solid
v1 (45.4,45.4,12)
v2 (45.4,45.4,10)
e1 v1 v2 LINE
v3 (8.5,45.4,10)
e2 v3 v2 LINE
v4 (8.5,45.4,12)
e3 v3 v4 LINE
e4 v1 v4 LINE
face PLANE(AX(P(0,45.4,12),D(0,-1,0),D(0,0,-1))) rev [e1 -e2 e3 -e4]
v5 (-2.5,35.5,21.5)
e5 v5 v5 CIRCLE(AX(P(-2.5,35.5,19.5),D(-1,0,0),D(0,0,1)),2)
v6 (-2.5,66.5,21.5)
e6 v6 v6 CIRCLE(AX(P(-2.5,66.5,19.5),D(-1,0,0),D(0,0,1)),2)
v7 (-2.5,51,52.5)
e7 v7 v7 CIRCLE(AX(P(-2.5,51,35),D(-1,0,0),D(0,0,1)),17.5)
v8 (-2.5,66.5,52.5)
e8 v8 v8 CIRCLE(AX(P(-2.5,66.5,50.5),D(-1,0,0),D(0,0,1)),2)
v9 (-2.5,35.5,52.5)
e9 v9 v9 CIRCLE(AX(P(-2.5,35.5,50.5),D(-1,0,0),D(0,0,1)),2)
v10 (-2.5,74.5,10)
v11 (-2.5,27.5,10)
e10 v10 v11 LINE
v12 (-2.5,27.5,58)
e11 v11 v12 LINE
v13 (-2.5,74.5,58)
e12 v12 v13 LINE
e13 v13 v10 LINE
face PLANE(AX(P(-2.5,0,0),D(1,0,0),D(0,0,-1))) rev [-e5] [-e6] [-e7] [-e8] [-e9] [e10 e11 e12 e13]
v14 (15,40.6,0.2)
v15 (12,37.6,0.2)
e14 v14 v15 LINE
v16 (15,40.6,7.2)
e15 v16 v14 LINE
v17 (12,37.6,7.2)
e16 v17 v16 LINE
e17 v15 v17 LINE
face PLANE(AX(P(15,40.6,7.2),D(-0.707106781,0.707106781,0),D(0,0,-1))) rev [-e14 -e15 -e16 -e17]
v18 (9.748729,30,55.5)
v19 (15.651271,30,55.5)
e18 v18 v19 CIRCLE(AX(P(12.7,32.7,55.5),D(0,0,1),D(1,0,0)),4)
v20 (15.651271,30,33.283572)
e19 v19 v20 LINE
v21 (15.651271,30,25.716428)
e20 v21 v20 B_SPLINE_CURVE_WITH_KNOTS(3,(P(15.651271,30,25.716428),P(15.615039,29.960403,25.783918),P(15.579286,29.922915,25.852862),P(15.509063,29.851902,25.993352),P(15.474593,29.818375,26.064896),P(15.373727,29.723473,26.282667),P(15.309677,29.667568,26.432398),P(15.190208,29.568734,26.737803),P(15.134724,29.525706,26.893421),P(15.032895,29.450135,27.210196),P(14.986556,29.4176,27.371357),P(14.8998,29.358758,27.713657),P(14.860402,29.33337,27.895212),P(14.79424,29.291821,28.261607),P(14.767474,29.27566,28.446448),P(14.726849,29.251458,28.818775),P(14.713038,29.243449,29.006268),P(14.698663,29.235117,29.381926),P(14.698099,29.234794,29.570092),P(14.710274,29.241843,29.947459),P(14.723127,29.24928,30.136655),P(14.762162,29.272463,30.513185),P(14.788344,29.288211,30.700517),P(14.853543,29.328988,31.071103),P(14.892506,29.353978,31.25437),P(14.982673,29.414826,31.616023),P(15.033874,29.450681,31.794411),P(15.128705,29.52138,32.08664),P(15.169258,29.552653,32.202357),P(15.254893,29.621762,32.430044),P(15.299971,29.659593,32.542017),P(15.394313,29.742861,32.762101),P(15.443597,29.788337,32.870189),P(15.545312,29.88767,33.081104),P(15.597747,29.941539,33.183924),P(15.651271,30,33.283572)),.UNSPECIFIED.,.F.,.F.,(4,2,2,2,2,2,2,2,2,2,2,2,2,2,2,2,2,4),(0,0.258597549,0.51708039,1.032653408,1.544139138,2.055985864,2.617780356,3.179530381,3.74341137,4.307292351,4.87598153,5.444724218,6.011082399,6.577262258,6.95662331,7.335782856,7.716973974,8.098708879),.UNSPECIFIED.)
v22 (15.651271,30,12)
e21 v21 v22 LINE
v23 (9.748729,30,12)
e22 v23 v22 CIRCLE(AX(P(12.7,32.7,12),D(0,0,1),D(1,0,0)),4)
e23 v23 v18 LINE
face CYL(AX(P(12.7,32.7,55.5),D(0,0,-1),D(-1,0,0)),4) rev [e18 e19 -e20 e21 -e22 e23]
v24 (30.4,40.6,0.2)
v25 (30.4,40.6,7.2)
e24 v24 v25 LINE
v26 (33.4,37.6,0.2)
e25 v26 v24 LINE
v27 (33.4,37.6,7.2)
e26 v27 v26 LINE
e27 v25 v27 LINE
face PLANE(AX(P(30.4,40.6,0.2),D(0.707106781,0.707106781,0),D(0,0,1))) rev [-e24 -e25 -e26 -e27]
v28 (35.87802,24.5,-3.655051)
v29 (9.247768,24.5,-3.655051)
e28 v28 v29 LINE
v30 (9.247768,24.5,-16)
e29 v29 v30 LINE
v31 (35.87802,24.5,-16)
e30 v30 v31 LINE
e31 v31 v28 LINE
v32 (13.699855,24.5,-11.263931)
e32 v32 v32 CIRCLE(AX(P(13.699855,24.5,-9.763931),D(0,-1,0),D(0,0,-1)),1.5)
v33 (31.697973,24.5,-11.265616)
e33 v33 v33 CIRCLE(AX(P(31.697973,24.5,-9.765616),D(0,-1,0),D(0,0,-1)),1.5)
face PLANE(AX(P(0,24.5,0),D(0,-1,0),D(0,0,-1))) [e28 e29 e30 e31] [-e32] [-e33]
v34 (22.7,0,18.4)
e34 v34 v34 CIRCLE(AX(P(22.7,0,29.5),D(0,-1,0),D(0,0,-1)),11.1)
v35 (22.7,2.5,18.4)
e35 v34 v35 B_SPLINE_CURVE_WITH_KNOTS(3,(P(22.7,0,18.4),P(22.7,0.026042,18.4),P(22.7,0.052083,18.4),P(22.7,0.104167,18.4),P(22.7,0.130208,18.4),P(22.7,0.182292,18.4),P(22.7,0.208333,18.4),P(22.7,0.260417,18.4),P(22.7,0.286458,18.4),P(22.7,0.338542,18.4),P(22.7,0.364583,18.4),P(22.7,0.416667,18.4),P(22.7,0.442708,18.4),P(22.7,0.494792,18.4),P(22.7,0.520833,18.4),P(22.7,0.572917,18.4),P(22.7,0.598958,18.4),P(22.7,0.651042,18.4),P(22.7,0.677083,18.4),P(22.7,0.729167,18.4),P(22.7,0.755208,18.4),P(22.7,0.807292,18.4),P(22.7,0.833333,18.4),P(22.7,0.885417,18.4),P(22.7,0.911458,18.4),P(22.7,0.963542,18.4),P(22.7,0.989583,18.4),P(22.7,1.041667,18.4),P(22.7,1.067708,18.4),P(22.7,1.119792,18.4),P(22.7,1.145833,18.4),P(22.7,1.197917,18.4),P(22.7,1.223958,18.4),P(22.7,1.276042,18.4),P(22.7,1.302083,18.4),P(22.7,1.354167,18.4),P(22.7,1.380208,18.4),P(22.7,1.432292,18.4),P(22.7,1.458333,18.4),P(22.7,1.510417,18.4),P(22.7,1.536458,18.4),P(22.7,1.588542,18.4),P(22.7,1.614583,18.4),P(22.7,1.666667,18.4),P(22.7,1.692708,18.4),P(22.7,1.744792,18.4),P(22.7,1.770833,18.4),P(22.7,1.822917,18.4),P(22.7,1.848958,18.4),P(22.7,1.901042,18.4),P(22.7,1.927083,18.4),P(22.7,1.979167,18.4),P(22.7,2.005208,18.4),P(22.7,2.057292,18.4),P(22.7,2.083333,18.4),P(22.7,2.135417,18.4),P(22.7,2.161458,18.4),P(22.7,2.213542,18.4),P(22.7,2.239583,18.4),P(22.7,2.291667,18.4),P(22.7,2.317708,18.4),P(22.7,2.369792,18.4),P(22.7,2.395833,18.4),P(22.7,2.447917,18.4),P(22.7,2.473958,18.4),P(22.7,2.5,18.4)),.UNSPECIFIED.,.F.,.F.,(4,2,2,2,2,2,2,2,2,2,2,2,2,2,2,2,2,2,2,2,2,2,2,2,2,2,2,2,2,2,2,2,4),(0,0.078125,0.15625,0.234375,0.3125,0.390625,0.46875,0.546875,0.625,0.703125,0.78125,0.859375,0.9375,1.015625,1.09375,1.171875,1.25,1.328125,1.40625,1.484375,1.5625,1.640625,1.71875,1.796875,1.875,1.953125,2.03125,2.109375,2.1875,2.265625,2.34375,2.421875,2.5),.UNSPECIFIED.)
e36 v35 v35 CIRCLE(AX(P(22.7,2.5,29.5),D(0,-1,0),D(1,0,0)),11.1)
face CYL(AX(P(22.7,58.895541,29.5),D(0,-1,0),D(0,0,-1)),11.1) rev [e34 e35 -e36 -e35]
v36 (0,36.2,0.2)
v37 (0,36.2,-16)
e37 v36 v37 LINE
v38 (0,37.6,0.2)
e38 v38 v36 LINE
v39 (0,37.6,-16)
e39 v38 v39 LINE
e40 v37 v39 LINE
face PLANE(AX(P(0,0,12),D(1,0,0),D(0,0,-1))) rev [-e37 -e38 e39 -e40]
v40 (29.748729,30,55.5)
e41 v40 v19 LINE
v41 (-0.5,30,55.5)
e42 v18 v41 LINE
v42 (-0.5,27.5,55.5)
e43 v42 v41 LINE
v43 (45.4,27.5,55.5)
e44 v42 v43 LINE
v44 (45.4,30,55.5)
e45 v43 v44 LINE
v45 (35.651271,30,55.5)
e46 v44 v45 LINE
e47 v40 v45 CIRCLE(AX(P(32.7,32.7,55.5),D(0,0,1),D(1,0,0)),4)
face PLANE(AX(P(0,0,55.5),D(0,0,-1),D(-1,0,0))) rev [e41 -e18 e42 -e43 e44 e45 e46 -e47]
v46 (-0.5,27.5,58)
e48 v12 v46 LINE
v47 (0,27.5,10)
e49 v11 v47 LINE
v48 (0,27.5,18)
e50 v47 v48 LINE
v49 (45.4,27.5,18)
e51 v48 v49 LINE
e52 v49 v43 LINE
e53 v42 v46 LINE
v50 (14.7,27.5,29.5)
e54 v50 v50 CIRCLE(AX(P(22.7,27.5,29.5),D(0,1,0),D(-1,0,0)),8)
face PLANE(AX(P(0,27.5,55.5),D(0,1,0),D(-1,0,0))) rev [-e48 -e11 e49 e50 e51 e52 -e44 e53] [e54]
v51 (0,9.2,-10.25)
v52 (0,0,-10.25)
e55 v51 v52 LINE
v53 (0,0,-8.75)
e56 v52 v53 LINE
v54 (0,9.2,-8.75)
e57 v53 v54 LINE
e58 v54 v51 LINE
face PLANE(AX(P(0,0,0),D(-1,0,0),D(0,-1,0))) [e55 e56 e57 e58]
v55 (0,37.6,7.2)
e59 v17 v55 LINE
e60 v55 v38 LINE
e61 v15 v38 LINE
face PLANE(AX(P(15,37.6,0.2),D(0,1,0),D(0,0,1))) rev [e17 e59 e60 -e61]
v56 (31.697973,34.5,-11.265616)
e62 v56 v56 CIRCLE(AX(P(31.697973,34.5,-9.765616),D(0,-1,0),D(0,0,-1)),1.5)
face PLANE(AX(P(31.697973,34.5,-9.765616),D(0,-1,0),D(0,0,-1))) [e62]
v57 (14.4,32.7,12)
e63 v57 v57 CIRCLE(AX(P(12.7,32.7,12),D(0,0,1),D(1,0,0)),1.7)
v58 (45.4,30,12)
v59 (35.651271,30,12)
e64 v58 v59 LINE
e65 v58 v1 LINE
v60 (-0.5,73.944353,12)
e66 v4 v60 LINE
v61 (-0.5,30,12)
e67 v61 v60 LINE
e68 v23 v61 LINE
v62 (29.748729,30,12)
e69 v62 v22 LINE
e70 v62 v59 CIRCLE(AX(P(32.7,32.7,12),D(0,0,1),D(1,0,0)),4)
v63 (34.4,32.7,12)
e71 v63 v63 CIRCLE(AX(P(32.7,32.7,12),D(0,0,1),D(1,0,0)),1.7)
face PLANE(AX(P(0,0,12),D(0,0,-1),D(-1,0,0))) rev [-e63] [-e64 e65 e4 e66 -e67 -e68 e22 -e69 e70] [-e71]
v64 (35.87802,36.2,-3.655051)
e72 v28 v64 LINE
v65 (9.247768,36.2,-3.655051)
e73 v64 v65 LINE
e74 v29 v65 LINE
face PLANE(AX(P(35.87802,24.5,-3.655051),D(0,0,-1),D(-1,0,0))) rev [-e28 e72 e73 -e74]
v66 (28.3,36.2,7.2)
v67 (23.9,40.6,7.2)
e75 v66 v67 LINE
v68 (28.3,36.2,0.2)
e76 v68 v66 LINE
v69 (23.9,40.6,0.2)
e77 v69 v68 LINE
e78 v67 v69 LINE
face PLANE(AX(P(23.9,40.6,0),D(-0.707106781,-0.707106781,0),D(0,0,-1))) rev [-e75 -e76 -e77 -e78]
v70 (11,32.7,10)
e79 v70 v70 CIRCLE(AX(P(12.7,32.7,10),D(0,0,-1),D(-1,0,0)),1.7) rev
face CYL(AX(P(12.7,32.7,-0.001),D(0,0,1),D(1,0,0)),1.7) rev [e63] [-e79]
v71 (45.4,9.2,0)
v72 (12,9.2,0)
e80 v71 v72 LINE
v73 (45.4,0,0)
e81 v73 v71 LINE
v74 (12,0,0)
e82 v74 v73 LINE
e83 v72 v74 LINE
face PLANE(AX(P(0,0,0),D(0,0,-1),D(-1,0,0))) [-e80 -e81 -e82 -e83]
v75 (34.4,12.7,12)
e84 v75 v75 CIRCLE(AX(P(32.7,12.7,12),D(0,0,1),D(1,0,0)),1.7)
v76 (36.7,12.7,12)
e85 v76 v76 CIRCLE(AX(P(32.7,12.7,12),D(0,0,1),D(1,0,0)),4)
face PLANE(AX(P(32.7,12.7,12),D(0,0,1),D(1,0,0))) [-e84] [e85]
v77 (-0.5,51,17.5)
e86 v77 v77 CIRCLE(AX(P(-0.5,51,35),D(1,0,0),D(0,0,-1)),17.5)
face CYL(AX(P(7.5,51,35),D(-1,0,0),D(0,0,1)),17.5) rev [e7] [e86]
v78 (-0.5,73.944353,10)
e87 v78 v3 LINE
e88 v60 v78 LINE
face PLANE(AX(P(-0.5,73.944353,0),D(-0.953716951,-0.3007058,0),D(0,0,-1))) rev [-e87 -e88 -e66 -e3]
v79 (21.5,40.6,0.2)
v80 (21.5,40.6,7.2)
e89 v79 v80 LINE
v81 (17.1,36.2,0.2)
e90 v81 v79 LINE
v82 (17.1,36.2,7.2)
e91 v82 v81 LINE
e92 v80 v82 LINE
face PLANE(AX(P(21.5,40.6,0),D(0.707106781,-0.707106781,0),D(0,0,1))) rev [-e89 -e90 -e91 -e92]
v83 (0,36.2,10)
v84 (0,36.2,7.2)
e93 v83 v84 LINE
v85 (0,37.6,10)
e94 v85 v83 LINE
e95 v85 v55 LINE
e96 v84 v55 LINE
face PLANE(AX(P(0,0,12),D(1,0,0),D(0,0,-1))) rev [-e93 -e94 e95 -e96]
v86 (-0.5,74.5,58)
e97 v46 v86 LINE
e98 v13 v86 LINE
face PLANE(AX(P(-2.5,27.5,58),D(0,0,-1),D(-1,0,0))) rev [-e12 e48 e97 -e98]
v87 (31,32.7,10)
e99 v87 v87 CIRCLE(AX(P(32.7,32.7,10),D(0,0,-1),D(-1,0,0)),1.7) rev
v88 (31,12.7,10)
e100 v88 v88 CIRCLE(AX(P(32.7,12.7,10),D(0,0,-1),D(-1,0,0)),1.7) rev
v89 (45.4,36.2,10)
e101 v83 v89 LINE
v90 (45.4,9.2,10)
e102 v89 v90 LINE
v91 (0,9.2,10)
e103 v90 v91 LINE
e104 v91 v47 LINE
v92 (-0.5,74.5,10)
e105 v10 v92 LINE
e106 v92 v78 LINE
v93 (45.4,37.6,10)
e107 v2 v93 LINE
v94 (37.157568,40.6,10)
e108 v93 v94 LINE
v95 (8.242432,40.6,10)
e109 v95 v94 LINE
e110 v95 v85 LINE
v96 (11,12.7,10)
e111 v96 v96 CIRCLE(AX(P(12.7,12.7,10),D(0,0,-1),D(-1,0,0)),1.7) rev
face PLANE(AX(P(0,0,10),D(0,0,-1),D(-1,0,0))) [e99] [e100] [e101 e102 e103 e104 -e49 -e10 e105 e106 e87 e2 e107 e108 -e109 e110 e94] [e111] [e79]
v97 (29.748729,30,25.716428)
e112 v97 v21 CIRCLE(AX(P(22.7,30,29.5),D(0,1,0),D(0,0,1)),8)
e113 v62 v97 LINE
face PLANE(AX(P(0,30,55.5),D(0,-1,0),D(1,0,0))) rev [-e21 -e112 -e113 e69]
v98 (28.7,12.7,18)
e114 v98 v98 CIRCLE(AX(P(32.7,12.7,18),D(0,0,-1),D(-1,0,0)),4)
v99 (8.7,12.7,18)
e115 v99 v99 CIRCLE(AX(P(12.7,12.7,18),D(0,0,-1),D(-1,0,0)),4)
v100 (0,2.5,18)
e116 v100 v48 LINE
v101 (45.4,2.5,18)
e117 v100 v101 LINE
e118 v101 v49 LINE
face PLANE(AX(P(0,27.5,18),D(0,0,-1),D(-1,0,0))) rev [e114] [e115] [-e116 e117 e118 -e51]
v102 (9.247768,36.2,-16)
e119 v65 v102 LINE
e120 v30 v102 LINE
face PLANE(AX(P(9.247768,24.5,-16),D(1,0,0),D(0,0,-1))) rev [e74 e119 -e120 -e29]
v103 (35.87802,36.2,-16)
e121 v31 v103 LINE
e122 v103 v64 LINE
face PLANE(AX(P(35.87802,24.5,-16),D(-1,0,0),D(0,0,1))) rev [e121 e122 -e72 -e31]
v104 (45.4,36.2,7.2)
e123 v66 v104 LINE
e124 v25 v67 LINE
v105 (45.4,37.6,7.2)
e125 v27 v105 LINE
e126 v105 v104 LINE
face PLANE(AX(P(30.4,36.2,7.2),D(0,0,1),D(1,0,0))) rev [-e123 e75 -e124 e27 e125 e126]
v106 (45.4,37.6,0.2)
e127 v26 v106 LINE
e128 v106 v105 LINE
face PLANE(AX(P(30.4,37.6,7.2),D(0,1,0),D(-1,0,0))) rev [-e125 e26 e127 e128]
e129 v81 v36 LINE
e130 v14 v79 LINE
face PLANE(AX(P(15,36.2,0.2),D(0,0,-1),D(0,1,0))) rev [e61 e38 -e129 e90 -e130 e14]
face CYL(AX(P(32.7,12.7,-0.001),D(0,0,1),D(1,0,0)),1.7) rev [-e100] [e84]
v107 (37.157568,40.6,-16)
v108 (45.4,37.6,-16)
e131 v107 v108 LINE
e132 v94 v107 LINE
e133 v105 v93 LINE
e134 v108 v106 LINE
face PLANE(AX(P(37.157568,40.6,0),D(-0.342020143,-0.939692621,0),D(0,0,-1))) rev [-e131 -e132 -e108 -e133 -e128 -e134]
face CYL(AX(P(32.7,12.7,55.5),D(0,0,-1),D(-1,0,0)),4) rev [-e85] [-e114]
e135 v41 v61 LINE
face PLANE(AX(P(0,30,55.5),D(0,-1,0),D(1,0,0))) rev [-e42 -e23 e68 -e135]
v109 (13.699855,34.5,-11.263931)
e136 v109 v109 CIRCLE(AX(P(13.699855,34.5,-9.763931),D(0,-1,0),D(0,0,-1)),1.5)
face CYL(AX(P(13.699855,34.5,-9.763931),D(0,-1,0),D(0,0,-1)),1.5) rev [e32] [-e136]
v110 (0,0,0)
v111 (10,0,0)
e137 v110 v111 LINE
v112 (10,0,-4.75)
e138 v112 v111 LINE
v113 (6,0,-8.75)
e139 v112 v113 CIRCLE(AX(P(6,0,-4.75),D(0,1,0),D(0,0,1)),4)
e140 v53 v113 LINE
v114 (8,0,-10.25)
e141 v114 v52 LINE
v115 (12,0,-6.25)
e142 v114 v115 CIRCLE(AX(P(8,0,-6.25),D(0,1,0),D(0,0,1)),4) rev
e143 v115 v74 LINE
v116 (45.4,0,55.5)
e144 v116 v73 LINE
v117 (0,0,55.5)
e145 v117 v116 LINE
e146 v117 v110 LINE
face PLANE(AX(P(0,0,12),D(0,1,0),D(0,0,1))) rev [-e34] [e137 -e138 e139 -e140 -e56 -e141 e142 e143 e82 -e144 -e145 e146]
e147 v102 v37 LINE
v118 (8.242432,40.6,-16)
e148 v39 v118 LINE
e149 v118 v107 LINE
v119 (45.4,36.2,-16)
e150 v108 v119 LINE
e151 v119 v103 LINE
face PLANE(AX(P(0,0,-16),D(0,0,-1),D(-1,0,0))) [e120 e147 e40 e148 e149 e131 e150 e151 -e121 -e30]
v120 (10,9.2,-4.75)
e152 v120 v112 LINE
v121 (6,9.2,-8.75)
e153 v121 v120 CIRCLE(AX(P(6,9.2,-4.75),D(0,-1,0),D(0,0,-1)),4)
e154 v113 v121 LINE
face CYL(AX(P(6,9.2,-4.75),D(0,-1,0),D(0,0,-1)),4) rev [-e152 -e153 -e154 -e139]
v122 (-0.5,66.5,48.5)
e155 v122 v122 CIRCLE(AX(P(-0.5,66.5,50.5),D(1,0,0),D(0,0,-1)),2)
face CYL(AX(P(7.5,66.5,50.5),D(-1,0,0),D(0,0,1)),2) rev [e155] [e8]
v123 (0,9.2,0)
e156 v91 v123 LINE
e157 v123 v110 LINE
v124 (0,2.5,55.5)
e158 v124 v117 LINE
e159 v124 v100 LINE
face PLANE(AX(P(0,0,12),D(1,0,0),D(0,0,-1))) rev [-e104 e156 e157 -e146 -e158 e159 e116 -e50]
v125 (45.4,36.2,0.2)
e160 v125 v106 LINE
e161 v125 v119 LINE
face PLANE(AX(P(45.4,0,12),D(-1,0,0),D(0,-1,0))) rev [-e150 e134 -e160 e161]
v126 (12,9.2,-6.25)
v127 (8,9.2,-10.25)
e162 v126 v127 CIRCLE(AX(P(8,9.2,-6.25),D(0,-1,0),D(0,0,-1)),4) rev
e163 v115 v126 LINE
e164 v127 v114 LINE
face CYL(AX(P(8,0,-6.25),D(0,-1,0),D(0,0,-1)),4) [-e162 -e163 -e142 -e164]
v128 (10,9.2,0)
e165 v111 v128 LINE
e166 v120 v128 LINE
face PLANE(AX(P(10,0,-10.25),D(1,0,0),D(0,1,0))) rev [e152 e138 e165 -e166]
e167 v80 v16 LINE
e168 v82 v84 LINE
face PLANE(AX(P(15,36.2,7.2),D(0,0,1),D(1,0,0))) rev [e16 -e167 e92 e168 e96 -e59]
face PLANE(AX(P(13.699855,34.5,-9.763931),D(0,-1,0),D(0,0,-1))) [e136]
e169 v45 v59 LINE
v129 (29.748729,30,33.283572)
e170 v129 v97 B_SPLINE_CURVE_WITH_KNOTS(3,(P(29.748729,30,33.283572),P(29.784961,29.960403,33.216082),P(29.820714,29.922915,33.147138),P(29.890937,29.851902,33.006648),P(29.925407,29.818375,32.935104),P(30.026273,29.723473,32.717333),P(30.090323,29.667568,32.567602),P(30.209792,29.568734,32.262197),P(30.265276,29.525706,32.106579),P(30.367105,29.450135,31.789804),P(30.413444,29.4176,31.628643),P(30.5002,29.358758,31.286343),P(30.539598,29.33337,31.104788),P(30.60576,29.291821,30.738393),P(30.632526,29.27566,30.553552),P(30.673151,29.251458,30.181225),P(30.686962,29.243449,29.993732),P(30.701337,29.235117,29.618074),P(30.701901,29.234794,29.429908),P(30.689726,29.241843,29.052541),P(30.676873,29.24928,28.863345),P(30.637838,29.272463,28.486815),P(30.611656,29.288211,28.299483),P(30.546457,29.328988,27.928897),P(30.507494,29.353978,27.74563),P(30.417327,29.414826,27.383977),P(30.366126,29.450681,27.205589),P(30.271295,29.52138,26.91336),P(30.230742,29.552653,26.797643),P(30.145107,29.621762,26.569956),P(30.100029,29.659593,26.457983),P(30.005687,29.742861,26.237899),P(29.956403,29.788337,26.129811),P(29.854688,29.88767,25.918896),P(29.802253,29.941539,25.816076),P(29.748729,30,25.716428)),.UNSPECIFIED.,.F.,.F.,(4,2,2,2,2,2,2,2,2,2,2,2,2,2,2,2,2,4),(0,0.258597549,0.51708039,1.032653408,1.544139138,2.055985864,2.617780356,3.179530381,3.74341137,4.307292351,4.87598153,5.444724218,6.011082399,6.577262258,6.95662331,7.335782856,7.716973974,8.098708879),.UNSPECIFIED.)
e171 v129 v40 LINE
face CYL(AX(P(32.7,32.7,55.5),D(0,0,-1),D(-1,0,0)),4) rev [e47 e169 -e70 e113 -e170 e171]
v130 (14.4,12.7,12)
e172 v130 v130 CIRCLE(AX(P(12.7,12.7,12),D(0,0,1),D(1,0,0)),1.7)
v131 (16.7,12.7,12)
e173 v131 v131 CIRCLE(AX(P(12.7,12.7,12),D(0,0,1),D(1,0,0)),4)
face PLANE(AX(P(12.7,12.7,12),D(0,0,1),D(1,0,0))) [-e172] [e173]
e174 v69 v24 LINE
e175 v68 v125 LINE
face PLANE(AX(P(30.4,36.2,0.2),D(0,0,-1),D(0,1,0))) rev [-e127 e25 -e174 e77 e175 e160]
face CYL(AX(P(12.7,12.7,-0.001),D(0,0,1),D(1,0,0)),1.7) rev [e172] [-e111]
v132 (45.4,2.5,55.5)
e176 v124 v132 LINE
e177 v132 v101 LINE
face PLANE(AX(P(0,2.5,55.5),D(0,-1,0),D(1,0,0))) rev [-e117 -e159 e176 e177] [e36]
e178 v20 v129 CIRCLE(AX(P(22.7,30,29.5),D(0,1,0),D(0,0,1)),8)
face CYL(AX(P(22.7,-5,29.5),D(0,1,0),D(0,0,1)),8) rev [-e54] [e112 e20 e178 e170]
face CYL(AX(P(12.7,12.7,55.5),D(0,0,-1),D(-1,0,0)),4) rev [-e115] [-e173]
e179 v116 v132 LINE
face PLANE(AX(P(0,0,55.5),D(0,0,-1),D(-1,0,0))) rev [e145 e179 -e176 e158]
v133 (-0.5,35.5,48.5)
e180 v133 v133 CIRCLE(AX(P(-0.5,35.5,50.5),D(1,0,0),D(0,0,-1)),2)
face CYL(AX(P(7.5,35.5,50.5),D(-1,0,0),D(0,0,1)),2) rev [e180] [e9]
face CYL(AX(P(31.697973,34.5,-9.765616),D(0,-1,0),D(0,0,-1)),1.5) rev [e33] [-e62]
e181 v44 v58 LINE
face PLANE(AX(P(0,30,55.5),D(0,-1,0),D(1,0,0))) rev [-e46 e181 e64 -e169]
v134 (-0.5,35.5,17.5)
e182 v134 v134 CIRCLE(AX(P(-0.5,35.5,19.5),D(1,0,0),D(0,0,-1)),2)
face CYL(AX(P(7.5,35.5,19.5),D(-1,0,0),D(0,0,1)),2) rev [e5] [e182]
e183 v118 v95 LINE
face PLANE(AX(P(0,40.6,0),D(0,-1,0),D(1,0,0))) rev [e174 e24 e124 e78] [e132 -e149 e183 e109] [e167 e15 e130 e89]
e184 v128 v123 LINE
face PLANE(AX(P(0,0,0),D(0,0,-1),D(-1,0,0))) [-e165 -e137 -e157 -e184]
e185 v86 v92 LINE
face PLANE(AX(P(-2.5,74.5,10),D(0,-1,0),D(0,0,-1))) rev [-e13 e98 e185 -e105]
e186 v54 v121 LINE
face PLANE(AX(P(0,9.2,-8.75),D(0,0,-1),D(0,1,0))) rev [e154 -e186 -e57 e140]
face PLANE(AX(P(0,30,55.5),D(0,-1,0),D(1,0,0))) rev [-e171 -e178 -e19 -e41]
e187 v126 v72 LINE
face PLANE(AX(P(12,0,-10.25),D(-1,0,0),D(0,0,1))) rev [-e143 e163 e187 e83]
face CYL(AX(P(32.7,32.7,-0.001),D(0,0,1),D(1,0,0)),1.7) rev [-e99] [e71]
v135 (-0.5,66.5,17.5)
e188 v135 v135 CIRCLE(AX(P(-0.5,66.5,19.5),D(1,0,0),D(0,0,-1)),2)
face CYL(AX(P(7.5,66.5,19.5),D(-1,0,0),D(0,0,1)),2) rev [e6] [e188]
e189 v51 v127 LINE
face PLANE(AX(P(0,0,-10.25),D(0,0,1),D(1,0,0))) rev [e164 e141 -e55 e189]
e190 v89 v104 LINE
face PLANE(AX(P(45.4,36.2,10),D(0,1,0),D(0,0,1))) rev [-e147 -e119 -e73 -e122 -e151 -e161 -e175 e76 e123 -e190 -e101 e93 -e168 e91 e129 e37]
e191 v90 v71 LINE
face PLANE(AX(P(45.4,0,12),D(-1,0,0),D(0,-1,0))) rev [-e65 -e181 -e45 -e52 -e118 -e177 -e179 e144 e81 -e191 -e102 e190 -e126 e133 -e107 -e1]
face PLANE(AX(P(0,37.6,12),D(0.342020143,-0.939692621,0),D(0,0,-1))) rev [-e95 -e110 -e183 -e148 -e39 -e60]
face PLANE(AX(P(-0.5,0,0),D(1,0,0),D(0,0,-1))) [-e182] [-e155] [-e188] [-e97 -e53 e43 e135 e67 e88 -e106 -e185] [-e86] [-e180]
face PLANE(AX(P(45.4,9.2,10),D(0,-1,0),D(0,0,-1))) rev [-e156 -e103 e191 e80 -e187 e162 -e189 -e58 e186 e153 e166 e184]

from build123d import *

# Parameters (mm, degrees)
SKETCH1_W                = 45.4
SKETCH1_H                = 45.4
BOSS_EXTRUDE1_DEPTH      = 12
SKETCH2_W                = 45.4
SKETCH2_H                = 27
CUT_EXTRUDE1_DEPTH       = 10
CUT_EXTRUDE4_REACH       = 67.317
SKETCH13_R               = 1.7
SKETCH20_W               = 7
SKETCH20_H               = 1.4
CUT_EXTRUDE10_DEPTH      = 15
SKETCH21_W               = 10
SKETCH21_H               = 4.8
CUT_EXTRUDE11_DEPTH      = 66.317072806
SKETCH22_W               = 7
SKETCH22_H               = 1.4
CUT_EXTRUDE12_DEPTH      = 15
SKETCH29_W               = 45.4
SKETCH29_H               = 30
BOSS_EXTRUDE6_DEPTH      = 43.5
SKETCH26_W               = 45.4
SKETCH26_H               = 4.4
BOSS_EXTRUDE4_DEPTH      = 16
CUT_EXTRUDE13_DEPTH      = 15
CUT_EXTRUDE13_DEPTH_BACK = 15
SKETCH23_W               = 2
SKETCH23_H               = 7
SKETCH17_R               = 4
CUT_EXTRUDE8_DEPTH       = 78.553658843
CHAMFER1_SIZE2           = 8.242432258
CHAMFER1_SIZE            = 3
CHAMFER2_SIZE2           = 3
CHAMFER2_SIZE            = 8.242432258
SKETCH24_W               = 2
SKETCH24_H               = 9.2
BOSS_EXTRUDE2_DEPTH      = 10.25
SKETCH25_W               = 1.5
SKETCH25_H               = 9.2
BOSS_EXTRUDE3_DEPTH      = 10
FILLET1_R                = 4
CHAMFER3_SIZE            = 3
CHAMFER4_SIZE            = 4.5
SKETCH27_W               = 26.630251868
SKETCH27_H               = 12.344948638
BOSS_EXTRUDE5_DEPTH      = 11.7
SKETCH36_W               = 37.5
SKETCH36_H               = 25
CUT_EXTRUDE18_DEPTH      = 85.867956261
SKETCH28_R               = 1.5
CUT_EXTRUDE14_DEPTH      = 10
SKETCH31_R               = 8
CUT_EXTRUDE15_DEPTH      = 35
SKETCH32_R               = 11.1
CUT_EXTRUDE16_DEPTH      = 27.5
BOSS_EXTRUDE7_DEPTH      = 0.5
SKETCH34_W               = 48
SKETCH34_H               = 47
BOSS_EXTRUDE8_DEPTH      = 2
SKETCH35_R               = 2
SKETCH35_R_2             = 17.5
CUT_EXTRUDE17_DEPTH      = 10
CHAMFER7_SIZE            = 9
CHAMFER7_SIZE2           = 28.544353221


# Some blends are built 0.0001 mm under size
with BuildPart() as part:
    # Sketch1 → Boss-Extrude1 (new body)
    with BuildSketch(Plane.XY):
        with Locations((22.7, 22.7)):
            Rectangle(SKETCH1_W, SKETCH1_H)
    extrude(amount=BOSS_EXTRUDE1_DEPTH)

    # Sketch2 → Cut-Extrude1 (cut)
    with BuildSketch(Plane(origin=(0, 0, 0), x_dir=(-1, 0, 0), z_dir=(0, 0, -1))):
        with Locations((-22.7, 22.7)):
            Rectangle(SKETCH2_W, SKETCH2_H)
    extrude(amount=-CUT_EXTRUDE1_DEPTH, mode=Mode.SUBTRACT)

    # Sketch13 → Cut-Extrude4 (cut, up to next)
    with BuildSketch(Plane.XY.offset(12), mode=Mode.PRIVATE) as cut_extrude4_sk1:
        with Locations((32.7, 32.7)):
            Circle(SKETCH13_R)
    cut_extrude4_tool1 = extrude(cut_extrude4_sk1.sketch, amount=-CUT_EXTRUDE4_REACH, mode=Mode.PRIVATE) & part.part
    # Sketch13 → Cut-Extrude4 (cut, up to next)
    with BuildSketch(Plane.XY.offset(12), mode=Mode.PRIVATE) as cut_extrude4_sk2:
        with Locations((12.7, 32.7)):
            Circle(SKETCH13_R)
    cut_extrude4_tool2 = extrude(cut_extrude4_sk2.sketch, amount=-CUT_EXTRUDE4_REACH, mode=Mode.PRIVATE) & part.part
    # Sketch13 → Cut-Extrude4 (cut, up to next)
    with BuildSketch(Plane.XY.offset(12), mode=Mode.PRIVATE) as cut_extrude4_sk3:
        with Locations((32.7, 12.7)):
            Circle(SKETCH13_R)
    cut_extrude4_tool3 = extrude(cut_extrude4_sk3.sketch, amount=-CUT_EXTRUDE4_REACH, mode=Mode.PRIVATE) & part.part
    # Sketch13 → Cut-Extrude4 (cut, up to next)
    with BuildSketch(Plane.XY.offset(12), mode=Mode.PRIVATE) as cut_extrude4_sk4:
        with Locations((12.7, 12.7)):
            Circle(SKETCH13_R)
    cut_extrude4_tool4 = extrude(cut_extrude4_sk4.sketch, amount=-CUT_EXTRUDE4_REACH, mode=Mode.PRIVATE) & part.part
    add(cut_extrude4_tool1.solids().sort_by_distance((32.7, 32.7, 12))[0], mode=Mode.SUBTRACT)
    add(cut_extrude4_tool2.solids().sort_by_distance((12.7, 32.7, 12))[0], mode=Mode.SUBTRACT)
    add(cut_extrude4_tool3.solids().sort_by_distance((32.7, 12.7, 12))[0], mode=Mode.SUBTRACT)
    add(cut_extrude4_tool4.solids().sort_by_distance((12.7, 12.7, 12))[0], mode=Mode.SUBTRACT)

    # Sketch20 → Cut-Extrude10 (cut)
    with BuildSketch(Plane(origin=(45.4, 0, 0), x_dir=(0, 0, -1), z_dir=(1, 0, 0))):
        with Locations((-3.7, 36.9)):
            Rectangle(SKETCH20_W, SKETCH20_H)
    extrude(amount=-CUT_EXTRUDE10_DEPTH, mode=Mode.SUBTRACT)

    # Sketch21 → Cut-Extrude11 (cut, through all)
    with BuildSketch(Plane(origin=(45.4, 0, 0), x_dir=(0, 0, -1), z_dir=(1, 0, 0))):
        with Locations((-5, 43)):
            Rectangle(SKETCH21_W, SKETCH21_H)
    extrude(amount=-CUT_EXTRUDE11_DEPTH, mode=Mode.SUBTRACT)

    # Sketch22 → Cut-Extrude12 (cut)
    with BuildSketch(Plane.ZY):
        with Locations((3.7, 36.9)):
            Rectangle(SKETCH22_W, SKETCH22_H)
    extrude(amount=-CUT_EXTRUDE12_DEPTH, mode=Mode.SUBTRACT)

    # Sketch29 → Boss-Extrude6 (add)
    with BuildSketch(Plane.XY.offset(12)):
        with Locations((22.7, 15)):
            Rectangle(SKETCH29_W, SKETCH29_H)
    extrude(amount=BOSS_EXTRUDE6_DEPTH)

    # Sketch26 → Boss-Extrude4 (add)
    with BuildSketch(Plane(origin=(0, 0, 0), x_dir=(-1, 0, 0), z_dir=(0, 0, -1))):
        with Locations((-22.7, 38.4)):
            Rectangle(SKETCH26_W, SKETCH26_H)
    extrude(amount=BOSS_EXTRUDE4_DEPTH)

    # Sketch23 → Cut-Extrude13 (cut, two sides: drawn at the far end of the back side and taken through both)
    with BuildSketch(Plane(origin=(0, 40.6, 0), x_dir=(1, 0, 0), z_dir=(0, 1, 0)).offset(-CUT_EXTRUDE13_DEPTH_BACK)):
        with Locations((29.4, -3.7)):
            Rectangle(SKETCH23_W, SKETCH23_H)
        with Locations((16, -3.7)):
            Rectangle(SKETCH23_W, SKETCH23_H)
    extrude(amount=CUT_EXTRUDE13_DEPTH + CUT_EXTRUDE13_DEPTH_BACK, mode=Mode.SUBTRACT)

    # Sketch17 → Cut-Extrude8 (cut, through all)
    with BuildSketch(Plane.XY.offset(12)):
        with Locations((12.7, 32.7)):
            Circle(SKETCH17_R)
        with Locations((32.7, 32.7)):
            Circle(SKETCH17_R)
        with Locations((32.7, 12.7)):
            Circle(SKETCH17_R)
        with Locations((12.7, 12.7)):
            Circle(SKETCH17_R)
    extrude(amount=CUT_EXTRUDE8_DEPTH, mode=Mode.SUBTRACT)

    # Chamfer1
    chamfer1_edges = [part.edges().sort_by_distance(p)[0] for p in [
        (45.4, 40.6, -3),
    ]]
    chamfer1_side = [part.faces().sort_by_distance(p)[0] for p in [
        (45.4, 40.54, -3),
    ]]
    chamfer(chamfer1_edges, length=CHAMFER1_SIZE - 0.0001, length2=CHAMFER1_SIZE2 - 0.0001, reference=chamfer1_side[0])  # a hair under: the kernel refuses the full size

    # Chamfer2
    chamfer2_edges = [part.edges().sort_by_distance(p)[0] for p in [
        (0, 40.6, -3),
    ]]
    chamfer2_side = [part.faces().sort_by_distance(p)[0] for p in [
        (0.06, 40.6, -3),
    ]]
    chamfer(chamfer2_edges, length=CHAMFER2_SIZE - 0.0001, length2=CHAMFER2_SIZE2 - 0.0001, reference=chamfer2_side[0])  # a hair under: the kernel refuses the full size

    # Sketch24 → Boss-Extrude2 (add)
    with BuildSketch(Plane(origin=(0, 0, 0), x_dir=(-1, 0, 0), z_dir=(0, 0, -1))):
        with Locations((-11, 4.6)):
            Rectangle(SKETCH24_W, SKETCH24_H)
    extrude(amount=BOSS_EXTRUDE2_DEPTH)

    # Sketch25 → Boss-Extrude3 (add)
    with BuildSketch(Plane.ZY.offset(-10)):
        with Locations((-9.5, 4.6)):
            Rectangle(SKETCH25_W, SKETCH25_H)
    extrude(amount=BOSS_EXTRUDE3_DEPTH)

    # Fillet1
    fillet1_edges = [part.edges().sort_by_distance(p)[0] for p in [
        (12, 4.6, -10.25),
        (10, 4.6, -8.75),
    ]]
    fillet(fillet1_edges, radius=FILLET1_R)

    # Chamfer3
    chamfer3_edges = [part.edges().sort_by_distance(p)[0] for p in [
        (15, 37.6, 3.7),
        (30.4, 37.6, 3.7),
    ]]
    chamfer(chamfer3_edges, length=CHAMFER3_SIZE - 0.0001)  # a hair under: the kernel refuses the full size

    # Chamfer4
    # the kernel refuses this chamfer: 4.5 mm, written as the material it takes off along each edge
    with BuildSketch(Plane(origin=(28.4, 40.6, 0.2), x_dir=(-0.9996219169112966, 0.027495876610586785, 0), z_dir=(0, 0, 1))) as chamfer4_piece_1:
        Polygon((CHAMFER4_SIZE * 0.999621916911, CHAMFER4_SIZE * 0.0274958766106), (-CHAMFER4_SIZE * 0.0274958766106, CHAMFER4_SIZE * 0.999621916911), (0, 0), align=None)
    extrude(amount=7, mode=Mode.SUBTRACT)
    with BuildSketch(Plane(origin=(17, 40.6, 0.2), x_dir=(0.9996219169112966, 0.027495876610586785, 0), z_dir=(0, 0, 1))) as chamfer4_piece_2:
        Polygon((CHAMFER4_SIZE * 0.999621916911, -CHAMFER4_SIZE * 0.0274958766106), (-CHAMFER4_SIZE * 0.0274958766106, -CHAMFER4_SIZE * 0.999621916911), (0, 0), align=None)
    extrude(amount=7, mode=Mode.SUBTRACT)

    # Sketch27 → Boss-Extrude5 (add)
    with BuildSketch(Plane.XZ.offset(-36.2)):
        with Locations((22.562894264, -9.827525681)):
            Rectangle(SKETCH27_W, SKETCH27_H)
    extrude(amount=BOSS_EXTRUDE5_DEPTH)

    # Sketch36 → Cut-Extrude18 (cut, through all)
    with BuildSketch(Plane(origin=(45.4, 0, 0), x_dir=(0, 0, -1), z_dir=(1, 0, 0))):
        with Locations((-36.75, 15)):
            Rectangle(SKETCH36_W, SKETCH36_H)
    extrude(amount=-CUT_EXTRUDE18_DEPTH, mode=Mode.SUBTRACT)

    # Sketch28 → Cut-Extrude14 (cut)
    with BuildSketch(Plane.XZ.offset(-24.5)):
        with Locations(Location((31.697973452, -9.765616126, 0), (0, 0, 270))):
            Circle(SKETCH28_R)
        with Locations(Location((13.699854881, -9.763930868, 0), (0, 0, 270))):
            Circle(SKETCH28_R)
    extrude(amount=-CUT_EXTRUDE14_DEPTH, mode=Mode.SUBTRACT)

    # Sketch31 → Cut-Extrude15 (cut)
    with BuildSketch(Plane(origin=(0, 30, 0), x_dir=(1, 0, 0), z_dir=(0, 1, 0))):
        with Locations(Location((22.7, -29.5, 0), (0, 0, 270))):
            Circle(SKETCH31_R)
    extrude(amount=-CUT_EXTRUDE15_DEPTH, mode=Mode.SUBTRACT)

    # Sketch32 → Cut-Extrude16 (cut)
    with BuildSketch(Plane.XZ):
        with Locations(Location((22.7, 29.5, 0), (0, 0, 270))):
            Circle(SKETCH32_R)
    extrude(amount=-CUT_EXTRUDE16_DEPTH, mode=Mode.SUBTRACT)

    # Sketch33 → Boss-Extrude7 (add)
    with BuildSketch(Plane.ZY):
        Polygon((10, 45.4), (12, 45.4), (12, 30), (55.5, 30), (55.5, 27.5), (10, 27.5), align=None)
    extrude(amount=BOSS_EXTRUDE7_DEPTH)

    # Sketch34 → Boss-Extrude8 (add)
    with BuildSketch(Plane.ZY.offset(0.5)):
        with Locations((34, 51)):
            Rectangle(SKETCH34_W, SKETCH34_H)
    extrude(amount=BOSS_EXTRUDE8_DEPTH)

    # Sketch35 → Cut-Extrude17 (cut)
    with BuildSketch(Plane.ZY.offset(2.5)):
        with Locations((19.5, 66.5)):
            Circle(SKETCH35_R)
        with Locations((50.5, 66.5)):
            Circle(SKETCH35_R)
        with Locations((50.5, 35.5)):
            Circle(SKETCH35_R)
        with Locations((19.5, 35.5)):
            Circle(SKETCH35_R)
        with Locations((35, 51)):
            Circle(SKETCH35_R_2)
    extrude(amount=-CUT_EXTRUDE17_DEPTH, mode=Mode.SUBTRACT)

    # Chamfer7
    chamfer7_edges = [part.edges().sort_by_distance(p)[0] for p in [
        (-0.5, 45.4, 11),
    ]]
    chamfer7_side = [part.faces().sort_by_distance(p)[0] for p in [
        (22.45, 45.4, 11),
    ]]
    chamfer(chamfer7_edges, length=CHAMFER7_SIZE, length2=CHAMFER7_SIZE2, reference=chamfer7_side[0])


solid = part.part
